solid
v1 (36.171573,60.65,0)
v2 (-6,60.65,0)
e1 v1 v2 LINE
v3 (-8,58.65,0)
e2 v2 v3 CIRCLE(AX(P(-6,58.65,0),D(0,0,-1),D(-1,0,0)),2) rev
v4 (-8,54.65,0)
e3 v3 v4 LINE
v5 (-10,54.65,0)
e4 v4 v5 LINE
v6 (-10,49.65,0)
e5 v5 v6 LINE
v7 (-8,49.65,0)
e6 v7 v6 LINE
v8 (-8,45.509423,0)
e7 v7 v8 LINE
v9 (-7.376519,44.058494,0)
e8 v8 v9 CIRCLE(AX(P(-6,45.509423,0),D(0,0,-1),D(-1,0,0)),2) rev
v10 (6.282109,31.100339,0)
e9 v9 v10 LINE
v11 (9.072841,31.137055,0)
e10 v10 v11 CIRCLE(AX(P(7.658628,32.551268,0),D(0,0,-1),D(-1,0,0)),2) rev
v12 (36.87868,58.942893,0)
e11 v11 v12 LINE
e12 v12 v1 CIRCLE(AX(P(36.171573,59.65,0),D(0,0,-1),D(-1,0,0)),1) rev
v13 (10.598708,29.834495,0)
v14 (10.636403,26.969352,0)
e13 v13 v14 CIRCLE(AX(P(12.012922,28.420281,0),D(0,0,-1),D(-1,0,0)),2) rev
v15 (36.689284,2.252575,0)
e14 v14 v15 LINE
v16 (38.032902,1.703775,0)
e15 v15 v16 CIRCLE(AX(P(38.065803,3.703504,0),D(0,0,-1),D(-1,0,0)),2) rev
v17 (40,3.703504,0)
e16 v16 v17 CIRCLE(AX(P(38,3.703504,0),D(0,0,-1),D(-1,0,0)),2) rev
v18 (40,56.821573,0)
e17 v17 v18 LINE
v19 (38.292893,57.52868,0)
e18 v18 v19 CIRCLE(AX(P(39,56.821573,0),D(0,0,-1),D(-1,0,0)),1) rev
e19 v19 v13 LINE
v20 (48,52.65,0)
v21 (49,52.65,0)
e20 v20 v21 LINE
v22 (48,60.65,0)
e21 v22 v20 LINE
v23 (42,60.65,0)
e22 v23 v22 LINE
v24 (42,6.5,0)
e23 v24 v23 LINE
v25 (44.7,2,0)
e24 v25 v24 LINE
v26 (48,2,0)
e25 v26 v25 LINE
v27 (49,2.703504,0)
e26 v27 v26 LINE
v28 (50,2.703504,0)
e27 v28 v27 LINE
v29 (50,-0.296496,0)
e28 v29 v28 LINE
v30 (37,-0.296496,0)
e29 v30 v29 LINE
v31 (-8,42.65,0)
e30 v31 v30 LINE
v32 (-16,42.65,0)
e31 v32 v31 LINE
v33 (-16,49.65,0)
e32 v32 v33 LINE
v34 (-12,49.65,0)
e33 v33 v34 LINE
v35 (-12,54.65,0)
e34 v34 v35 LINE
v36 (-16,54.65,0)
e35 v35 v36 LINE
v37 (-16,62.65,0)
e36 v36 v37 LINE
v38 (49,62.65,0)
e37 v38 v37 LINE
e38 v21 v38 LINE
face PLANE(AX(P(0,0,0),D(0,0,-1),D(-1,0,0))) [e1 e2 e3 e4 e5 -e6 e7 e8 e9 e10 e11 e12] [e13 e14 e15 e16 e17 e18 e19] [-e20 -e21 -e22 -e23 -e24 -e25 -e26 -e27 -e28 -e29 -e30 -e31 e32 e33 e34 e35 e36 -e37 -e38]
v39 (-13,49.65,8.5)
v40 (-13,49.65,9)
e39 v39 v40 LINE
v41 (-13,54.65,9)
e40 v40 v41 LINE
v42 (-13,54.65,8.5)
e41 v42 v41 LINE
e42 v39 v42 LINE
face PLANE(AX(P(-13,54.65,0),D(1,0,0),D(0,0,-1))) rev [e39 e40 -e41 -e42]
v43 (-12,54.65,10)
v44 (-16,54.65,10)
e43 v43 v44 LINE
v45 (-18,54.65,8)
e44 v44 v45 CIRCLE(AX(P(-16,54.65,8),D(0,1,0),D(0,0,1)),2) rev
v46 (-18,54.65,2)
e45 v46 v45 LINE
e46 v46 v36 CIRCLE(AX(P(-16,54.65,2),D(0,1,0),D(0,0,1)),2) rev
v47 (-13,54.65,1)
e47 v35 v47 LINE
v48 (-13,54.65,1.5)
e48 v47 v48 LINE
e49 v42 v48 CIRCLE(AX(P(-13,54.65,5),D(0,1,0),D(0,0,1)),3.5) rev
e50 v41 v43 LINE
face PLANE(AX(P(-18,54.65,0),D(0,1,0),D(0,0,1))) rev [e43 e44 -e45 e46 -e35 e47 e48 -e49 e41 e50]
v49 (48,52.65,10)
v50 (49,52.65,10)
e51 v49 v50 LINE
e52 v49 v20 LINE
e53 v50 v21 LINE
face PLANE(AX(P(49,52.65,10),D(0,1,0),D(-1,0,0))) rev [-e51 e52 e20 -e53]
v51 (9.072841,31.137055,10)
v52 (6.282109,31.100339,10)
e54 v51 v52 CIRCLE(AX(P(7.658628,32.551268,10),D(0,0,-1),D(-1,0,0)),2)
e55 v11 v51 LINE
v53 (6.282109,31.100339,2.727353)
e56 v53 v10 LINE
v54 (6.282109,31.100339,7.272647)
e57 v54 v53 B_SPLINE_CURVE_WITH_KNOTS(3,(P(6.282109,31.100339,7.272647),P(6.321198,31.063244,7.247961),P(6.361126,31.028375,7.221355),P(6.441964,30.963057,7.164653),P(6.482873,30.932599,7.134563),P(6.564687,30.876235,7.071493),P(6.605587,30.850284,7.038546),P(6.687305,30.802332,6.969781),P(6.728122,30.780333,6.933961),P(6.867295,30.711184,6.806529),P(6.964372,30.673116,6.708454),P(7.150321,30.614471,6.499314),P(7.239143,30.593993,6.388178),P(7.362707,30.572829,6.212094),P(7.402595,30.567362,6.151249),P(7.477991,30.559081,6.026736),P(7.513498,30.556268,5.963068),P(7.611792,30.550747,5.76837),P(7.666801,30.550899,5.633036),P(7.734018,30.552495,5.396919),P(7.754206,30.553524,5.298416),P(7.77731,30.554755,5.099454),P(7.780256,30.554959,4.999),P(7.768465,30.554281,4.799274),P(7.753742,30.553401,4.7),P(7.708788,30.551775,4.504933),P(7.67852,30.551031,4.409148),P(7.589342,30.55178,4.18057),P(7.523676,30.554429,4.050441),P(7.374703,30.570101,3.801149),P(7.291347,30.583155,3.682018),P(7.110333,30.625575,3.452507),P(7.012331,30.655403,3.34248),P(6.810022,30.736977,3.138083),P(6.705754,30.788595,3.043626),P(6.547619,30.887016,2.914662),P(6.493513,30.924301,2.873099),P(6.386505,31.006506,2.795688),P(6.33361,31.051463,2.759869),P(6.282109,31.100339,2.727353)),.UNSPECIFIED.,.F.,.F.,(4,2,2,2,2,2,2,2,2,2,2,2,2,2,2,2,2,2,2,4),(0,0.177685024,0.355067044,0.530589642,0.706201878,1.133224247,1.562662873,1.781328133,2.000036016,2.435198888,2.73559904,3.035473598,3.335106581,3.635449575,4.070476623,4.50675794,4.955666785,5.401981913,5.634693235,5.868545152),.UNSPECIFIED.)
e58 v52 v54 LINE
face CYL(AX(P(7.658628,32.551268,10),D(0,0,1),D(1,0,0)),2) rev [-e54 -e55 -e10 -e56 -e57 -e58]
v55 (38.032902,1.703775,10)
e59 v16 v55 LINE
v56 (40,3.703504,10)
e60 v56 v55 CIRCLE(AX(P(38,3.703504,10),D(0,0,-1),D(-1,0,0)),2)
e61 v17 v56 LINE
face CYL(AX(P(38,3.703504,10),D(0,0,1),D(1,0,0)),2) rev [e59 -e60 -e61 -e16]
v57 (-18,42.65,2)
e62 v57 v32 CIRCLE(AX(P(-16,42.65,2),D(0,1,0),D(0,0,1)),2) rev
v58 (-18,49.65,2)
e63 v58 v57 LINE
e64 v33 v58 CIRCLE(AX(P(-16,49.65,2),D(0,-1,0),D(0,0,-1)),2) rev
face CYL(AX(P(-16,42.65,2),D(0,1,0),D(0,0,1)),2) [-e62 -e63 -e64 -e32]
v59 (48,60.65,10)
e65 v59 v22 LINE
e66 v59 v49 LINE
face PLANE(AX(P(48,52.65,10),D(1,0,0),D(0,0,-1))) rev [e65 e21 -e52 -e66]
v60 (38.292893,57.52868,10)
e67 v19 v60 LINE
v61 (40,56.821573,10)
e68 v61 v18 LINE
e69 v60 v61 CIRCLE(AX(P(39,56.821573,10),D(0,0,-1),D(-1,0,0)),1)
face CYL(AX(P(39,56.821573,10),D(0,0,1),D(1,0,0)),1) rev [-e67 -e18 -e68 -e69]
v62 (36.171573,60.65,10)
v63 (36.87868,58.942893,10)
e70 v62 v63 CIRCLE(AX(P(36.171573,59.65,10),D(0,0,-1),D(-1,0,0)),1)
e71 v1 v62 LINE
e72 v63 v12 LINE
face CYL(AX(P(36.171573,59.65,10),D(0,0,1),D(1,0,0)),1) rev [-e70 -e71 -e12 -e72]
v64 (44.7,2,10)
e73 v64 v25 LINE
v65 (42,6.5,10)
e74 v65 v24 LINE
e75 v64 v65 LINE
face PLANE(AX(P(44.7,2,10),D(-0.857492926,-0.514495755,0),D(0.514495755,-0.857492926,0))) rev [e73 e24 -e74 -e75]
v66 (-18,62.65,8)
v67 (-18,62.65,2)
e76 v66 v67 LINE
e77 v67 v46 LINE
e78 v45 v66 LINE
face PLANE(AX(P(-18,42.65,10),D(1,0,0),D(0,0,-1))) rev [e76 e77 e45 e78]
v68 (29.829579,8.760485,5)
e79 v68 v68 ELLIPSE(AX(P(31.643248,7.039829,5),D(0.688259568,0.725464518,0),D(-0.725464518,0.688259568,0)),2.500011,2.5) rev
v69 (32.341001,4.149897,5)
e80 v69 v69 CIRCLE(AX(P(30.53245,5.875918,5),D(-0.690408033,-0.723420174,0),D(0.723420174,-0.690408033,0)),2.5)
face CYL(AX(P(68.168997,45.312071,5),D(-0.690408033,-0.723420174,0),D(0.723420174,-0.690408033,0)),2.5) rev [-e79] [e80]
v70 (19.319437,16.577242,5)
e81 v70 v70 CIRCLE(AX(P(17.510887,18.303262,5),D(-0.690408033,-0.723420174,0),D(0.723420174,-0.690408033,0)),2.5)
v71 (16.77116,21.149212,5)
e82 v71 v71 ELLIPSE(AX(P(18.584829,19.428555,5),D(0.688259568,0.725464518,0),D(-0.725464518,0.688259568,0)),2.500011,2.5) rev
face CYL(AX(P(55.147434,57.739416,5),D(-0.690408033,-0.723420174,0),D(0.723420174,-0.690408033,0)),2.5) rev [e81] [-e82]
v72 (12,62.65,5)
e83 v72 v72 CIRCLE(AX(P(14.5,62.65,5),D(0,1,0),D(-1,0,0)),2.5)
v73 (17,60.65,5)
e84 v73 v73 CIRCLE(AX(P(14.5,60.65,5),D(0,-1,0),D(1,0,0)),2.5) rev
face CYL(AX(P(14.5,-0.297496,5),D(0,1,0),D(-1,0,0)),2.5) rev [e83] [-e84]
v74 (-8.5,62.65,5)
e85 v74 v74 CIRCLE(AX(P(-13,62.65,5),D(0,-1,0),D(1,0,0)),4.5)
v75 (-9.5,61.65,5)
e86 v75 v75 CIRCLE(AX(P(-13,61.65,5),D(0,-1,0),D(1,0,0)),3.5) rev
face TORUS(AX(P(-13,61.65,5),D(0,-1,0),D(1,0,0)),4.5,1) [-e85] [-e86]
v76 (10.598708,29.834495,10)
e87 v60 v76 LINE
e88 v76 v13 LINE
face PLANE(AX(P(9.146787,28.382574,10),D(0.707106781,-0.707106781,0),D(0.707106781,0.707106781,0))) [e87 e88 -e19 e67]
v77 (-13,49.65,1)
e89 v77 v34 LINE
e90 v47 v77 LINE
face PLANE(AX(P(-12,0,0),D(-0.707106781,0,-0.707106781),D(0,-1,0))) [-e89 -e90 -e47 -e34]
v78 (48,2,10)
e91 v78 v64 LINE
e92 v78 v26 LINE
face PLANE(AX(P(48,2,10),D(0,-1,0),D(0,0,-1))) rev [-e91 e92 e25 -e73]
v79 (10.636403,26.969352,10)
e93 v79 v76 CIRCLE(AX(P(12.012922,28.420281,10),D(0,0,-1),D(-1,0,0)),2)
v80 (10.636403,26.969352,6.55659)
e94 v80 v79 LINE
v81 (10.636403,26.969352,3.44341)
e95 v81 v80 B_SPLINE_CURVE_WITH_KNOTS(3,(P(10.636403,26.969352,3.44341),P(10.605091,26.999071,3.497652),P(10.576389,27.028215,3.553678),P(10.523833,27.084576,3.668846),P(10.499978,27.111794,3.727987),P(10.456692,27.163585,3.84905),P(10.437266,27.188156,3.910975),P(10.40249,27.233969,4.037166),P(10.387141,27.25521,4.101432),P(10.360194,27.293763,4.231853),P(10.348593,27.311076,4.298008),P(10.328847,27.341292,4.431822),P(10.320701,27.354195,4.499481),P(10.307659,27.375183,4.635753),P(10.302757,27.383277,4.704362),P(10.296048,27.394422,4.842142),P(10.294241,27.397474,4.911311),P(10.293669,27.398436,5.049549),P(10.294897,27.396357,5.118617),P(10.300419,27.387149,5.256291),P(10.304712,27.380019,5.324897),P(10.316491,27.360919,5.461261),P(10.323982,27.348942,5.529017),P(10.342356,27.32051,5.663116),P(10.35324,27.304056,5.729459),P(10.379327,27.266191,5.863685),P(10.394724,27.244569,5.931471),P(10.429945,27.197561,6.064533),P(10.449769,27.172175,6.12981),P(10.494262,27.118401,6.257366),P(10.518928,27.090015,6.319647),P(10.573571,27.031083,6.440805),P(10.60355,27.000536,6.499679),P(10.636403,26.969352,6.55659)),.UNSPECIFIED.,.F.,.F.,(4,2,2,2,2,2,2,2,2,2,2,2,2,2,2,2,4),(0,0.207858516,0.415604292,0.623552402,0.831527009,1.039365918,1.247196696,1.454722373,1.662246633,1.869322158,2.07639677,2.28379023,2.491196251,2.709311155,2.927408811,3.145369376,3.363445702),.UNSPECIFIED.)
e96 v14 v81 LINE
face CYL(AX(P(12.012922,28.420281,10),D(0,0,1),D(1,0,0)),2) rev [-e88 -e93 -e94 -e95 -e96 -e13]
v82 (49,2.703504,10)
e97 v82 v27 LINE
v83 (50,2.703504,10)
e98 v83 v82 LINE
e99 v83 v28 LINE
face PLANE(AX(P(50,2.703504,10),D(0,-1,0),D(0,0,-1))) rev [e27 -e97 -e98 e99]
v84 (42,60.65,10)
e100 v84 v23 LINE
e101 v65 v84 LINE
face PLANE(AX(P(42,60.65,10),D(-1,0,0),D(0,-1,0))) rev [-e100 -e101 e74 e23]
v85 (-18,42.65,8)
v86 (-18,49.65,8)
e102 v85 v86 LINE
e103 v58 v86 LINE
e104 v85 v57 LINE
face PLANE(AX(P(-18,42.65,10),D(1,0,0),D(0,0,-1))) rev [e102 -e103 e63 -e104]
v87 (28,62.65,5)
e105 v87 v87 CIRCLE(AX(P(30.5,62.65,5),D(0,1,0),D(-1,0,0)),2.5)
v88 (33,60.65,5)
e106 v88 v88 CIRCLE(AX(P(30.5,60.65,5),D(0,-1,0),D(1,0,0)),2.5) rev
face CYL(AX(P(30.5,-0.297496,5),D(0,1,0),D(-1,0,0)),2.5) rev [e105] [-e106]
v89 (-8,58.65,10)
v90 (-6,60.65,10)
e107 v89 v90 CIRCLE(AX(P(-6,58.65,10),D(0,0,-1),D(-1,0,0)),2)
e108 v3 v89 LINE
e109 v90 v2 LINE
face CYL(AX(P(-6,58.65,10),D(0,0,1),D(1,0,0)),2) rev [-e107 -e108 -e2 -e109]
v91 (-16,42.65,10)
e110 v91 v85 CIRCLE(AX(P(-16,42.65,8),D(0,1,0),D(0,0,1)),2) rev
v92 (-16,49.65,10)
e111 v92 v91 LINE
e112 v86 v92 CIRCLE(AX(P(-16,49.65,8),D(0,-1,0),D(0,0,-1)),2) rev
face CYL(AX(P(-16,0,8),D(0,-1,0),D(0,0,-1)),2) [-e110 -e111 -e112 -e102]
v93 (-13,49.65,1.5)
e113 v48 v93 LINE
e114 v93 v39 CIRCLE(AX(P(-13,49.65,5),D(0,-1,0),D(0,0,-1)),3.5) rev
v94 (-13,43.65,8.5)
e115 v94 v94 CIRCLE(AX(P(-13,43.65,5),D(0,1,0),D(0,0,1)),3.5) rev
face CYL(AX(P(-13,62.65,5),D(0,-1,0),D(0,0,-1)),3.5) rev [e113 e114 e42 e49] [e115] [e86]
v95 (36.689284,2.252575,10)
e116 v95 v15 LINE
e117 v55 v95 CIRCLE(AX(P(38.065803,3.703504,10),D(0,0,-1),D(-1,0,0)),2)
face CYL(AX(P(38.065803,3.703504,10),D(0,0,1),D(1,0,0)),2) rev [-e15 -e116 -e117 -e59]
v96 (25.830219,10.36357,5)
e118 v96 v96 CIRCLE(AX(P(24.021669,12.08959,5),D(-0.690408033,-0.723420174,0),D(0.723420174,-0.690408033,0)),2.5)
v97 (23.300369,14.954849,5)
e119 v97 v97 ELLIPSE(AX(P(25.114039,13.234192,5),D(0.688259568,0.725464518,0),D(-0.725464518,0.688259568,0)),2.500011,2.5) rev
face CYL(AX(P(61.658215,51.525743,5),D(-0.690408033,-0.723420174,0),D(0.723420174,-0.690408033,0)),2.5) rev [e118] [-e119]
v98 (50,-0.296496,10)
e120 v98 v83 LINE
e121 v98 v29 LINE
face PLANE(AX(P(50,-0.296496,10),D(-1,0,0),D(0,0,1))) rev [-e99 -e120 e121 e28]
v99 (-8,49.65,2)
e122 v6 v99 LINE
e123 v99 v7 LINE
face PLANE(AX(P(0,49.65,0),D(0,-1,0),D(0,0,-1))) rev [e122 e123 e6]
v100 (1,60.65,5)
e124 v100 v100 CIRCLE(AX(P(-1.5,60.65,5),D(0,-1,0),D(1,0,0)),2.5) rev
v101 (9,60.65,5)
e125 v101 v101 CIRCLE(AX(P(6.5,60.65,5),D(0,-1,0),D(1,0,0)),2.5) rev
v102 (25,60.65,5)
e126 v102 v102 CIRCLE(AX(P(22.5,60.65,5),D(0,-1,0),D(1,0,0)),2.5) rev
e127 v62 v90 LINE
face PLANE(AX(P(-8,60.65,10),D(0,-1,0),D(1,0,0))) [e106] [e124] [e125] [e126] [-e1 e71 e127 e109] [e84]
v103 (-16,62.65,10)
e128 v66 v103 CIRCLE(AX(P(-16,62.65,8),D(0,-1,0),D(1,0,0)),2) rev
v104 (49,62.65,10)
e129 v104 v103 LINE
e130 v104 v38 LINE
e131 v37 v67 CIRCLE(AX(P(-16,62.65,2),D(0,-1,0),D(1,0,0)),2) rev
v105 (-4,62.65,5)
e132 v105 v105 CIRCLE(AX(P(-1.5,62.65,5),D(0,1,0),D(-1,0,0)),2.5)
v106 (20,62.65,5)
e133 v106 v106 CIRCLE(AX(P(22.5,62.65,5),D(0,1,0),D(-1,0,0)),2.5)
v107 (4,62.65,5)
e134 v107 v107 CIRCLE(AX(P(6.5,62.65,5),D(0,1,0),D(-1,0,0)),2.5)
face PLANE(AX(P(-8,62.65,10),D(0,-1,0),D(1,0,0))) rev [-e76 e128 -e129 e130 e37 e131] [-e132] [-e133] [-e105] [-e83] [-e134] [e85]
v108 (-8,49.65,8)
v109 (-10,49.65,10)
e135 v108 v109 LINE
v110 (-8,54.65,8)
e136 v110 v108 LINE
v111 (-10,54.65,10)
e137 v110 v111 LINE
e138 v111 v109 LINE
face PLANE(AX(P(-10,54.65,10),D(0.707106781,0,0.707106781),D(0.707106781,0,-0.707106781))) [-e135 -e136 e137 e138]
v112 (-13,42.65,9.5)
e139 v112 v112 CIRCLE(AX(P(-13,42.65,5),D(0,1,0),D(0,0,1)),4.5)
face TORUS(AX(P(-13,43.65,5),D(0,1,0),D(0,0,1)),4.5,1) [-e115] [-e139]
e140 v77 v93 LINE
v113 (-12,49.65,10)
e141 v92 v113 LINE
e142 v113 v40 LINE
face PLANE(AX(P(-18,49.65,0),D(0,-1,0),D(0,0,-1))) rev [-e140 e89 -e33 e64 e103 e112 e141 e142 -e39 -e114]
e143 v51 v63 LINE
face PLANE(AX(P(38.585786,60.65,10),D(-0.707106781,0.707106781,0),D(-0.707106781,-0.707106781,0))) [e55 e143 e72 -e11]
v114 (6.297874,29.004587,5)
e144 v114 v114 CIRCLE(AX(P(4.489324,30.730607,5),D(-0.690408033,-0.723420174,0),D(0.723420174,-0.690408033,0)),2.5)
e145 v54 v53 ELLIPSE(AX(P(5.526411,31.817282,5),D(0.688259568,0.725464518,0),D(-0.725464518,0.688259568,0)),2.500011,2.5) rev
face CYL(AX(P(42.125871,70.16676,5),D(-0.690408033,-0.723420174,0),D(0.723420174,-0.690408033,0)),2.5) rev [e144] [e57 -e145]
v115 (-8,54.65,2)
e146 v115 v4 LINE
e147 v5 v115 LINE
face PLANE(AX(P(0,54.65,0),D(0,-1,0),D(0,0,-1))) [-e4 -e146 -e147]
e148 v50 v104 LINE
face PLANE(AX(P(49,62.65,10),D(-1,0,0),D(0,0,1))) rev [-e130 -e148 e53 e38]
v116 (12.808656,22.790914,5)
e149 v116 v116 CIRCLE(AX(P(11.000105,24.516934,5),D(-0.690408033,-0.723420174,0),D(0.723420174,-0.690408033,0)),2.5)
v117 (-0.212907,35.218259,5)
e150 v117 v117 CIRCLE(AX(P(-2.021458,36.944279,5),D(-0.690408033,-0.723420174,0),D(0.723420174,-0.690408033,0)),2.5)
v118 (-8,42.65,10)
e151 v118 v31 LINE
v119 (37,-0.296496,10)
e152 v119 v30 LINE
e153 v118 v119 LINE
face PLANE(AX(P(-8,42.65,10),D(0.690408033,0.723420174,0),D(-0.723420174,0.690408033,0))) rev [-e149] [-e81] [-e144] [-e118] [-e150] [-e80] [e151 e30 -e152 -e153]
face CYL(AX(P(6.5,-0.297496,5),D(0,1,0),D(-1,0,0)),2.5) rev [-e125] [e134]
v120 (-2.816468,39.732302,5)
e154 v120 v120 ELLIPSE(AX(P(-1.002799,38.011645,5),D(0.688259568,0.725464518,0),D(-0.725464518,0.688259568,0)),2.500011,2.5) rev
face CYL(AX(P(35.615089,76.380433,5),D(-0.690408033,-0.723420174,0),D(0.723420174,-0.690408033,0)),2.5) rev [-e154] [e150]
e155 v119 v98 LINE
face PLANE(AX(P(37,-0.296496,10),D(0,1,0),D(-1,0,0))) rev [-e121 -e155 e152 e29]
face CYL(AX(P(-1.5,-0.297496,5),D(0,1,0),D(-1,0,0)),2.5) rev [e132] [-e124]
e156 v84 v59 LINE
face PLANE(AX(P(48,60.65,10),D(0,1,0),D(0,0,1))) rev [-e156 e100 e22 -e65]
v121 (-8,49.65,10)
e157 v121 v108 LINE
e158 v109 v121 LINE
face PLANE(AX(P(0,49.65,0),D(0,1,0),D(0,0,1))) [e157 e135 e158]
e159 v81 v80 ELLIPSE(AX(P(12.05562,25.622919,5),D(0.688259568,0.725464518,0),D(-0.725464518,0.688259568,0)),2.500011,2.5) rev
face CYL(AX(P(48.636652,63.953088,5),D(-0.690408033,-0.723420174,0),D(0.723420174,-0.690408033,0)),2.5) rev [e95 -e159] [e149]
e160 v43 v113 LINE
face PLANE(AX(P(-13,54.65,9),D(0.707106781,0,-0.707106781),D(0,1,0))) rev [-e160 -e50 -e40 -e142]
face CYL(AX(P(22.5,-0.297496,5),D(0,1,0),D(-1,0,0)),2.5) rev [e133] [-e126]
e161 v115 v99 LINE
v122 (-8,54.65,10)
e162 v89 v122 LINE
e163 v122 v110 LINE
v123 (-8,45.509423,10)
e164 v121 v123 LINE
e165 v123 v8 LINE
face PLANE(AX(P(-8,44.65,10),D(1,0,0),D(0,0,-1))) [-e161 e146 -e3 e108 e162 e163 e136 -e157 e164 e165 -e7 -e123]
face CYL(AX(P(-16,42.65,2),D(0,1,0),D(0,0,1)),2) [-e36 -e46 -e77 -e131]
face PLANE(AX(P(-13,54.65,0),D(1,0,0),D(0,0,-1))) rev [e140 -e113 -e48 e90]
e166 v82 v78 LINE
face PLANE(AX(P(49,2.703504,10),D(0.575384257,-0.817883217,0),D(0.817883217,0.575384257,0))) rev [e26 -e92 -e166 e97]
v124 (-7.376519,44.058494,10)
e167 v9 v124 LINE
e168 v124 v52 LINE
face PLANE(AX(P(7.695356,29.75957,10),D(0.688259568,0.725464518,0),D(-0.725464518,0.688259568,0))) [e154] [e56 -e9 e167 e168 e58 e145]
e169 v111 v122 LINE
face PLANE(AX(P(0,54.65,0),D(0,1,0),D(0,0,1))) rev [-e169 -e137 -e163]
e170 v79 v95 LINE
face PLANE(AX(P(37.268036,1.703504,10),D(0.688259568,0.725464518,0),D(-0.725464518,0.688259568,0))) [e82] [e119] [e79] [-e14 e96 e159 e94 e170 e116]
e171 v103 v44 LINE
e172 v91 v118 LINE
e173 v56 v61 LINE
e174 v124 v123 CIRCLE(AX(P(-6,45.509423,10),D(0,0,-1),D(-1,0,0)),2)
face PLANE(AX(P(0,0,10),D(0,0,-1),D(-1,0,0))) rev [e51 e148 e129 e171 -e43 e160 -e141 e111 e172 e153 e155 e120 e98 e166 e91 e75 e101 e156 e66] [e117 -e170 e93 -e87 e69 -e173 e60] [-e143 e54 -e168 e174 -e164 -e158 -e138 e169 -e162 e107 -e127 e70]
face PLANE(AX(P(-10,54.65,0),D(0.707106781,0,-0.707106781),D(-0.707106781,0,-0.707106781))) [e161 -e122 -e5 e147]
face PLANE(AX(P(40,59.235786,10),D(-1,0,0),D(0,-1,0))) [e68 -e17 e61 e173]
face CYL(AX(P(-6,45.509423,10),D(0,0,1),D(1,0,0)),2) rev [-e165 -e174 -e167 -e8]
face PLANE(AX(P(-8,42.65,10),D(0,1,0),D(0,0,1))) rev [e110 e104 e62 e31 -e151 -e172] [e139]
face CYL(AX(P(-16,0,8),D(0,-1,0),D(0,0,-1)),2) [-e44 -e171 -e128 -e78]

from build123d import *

# Parameters (mm, degrees)
FRAME_DEPTH         = 10
SKETCH13_R          = 3.5
CUT_EXTRUDE7_DEPTH  = 67.66634461
FILLET4_R           = 1
SKETCH14_W          = 5
SKETCH14_H          = 5
CUT_EXTRUDE8_DEPTH  = 81.777611378
FILLET5_R           = 2
CUT_EXTRUDE9_DEPTH  = 5
CHAMFER1_SIZE       = 1
FILLET6_R           = 2
FILLET7_R           = 1
CUT_EXTRUDE11_REACH = 59.656
SKETCH18_R          = 2.5
CUT_EXTRUDE12_REACH = 83.008
SKETCH19_R          = 2.5


with BuildPart() as part:
    # Sketch1 → Frame (new body)
    with BuildSketch(Plane.XY):
        Polygon((-8, 62.65), (49, 62.65), (49, 52.65), (48, 52.65), (48, 60.65), (42, 60.65), (42, 6.5), (44.7, 2), (48, 2), (49, 2.703504174), (50, 2.703504174), (50, -0.296495826), (37, -0.296495826), (-8, 42.65), (-18, 42.65), (-18, 62.65), align=None)
        Polygon((-8, 44.65), (-8, 60.65), (38.585786438, 60.65), (7.695355997, 29.759569559), align=None, mode=Mode.SUBTRACT)
        Polygon((40, 59.235786438), (40, 1.703504174), (37.268035971, 1.703504174), (9.146787391, 28.382573828), align=None, mode=Mode.SUBTRACT)
    extrude(amount=FRAME_DEPTH)

    # Sketch13 → Cut-Extrude7 (cut, through all)
    with BuildSketch(Plane.XZ.offset(-42.65)):
        with Locations(Location((-13, 5, 0), (0, 0, 270))):
            Circle(SKETCH13_R)
    extrude(amount=-CUT_EXTRUDE7_DEPTH, mode=Mode.SUBTRACT)

    # Fillet4
    fillet4_edges = [part.edges().sort_by_distance(p)[0] for p in [
        (-13, 62.65, 8.5),
        (-13, 42.65, 8.5),
    ]]
    fillet(fillet4_edges, radius=FILLET4_R)

    # Sketch14 → Cut-Extrude8 (cut, through all)
    with BuildSketch(Plane.XY.offset(10)):
        with Locations((-15.5, 52.15)):
            Rectangle(SKETCH14_W, SKETCH14_H)
    extrude(amount=-CUT_EXTRUDE8_DEPTH, mode=Mode.SUBTRACT)

    # Fillet5
    fillet5_edges = [part.edges().sort_by_distance(p)[0] for p in [
        (-18, 58.65, 0),
        (-18, 58.65, 10),
        (-18, 46.15, 0),
        (-18, 46.15, 10),
    ]]
    fillet(fillet5_edges, radius=FILLET5_R)

    # Sketch15 → Cut-Extrude9 (cut)
    with BuildSketch(Plane(origin=(0, 49.65, 0), x_dir=(1, 0, 0), z_dir=(0, 1, 0))):
        Polygon((-10, 0), (-8, -2), (-8, 0), align=None)
        Polygon((-10, -10), (-8, -8), (-8, -10), align=None)
    extrude(amount=CUT_EXTRUDE9_DEPTH, mode=Mode.SUBTRACT)

    # Chamfer1
    chamfer1_edges = [part.edges().sort_by_distance(p)[0] for p in [
        (-13, 52.15, 0),
        (-13, 52.15, 10),
    ]]
    chamfer(chamfer1_edges, length=CHAMFER1_SIZE)

    # Fillet6
    # the kernel refuses this fillet: 2 mm, written as the material it adds along each edge
    with BuildSketch(Plane(origin=(-8, 60.65, 0), x_dir=(0, -1, 0), z_dir=(0, 0, 1)), Plane(origin=(40, 1.703504174, 0), x_dir=(0, 1, 0), z_dir=(0, 0, 1))) as fillet6_piece_1:
        with BuildLine():
            CenterArc((FILLET6_R, FILLET6_R), FILLET6_R, 180, 90)
            Line((0, FILLET6_R), (0, 0))
            Line((0, 0), (FILLET6_R, 0))
        make_face()
    extrude(amount=10)
    with BuildSketch(Plane(origin=(37.268035971, 1.703504174, 0), x_dir=(1, 0, 0), z_dir=(0, 0, 1))) as fillet6_piece_2:
        with BuildLine():
            CenterArc((FILLET6_R * 0.398883640348, FILLET6_R), FILLET6_R, 226.507503973, 43.492496027)
            Line((-FILLET6_R * 0.289375927855, FILLET6_R * 0.274535482069), (0, 0))
            Line((0, 0), (FILLET6_R * 0.398883640348, 0))
        make_face()
    extrude(amount=10)
    with BuildSketch(Plane(origin=(-8, 44.65, 0), x_dir=(0, 1, 0), z_dir=(0, 0, 1))) as fillet6_piece_3:
        with BuildLine():
            CenterArc((FILLET6_R * 0.429711480151, -FILLET6_R), FILLET6_R, 90, 46.507503973)
            Line((-FILLET6_R * 0.29575303778, -FILLET6_R * 0.311740431797), (0, 0))
            Line((0, 0), (FILLET6_R * 0.429711480151, 0))
        make_face()
    extrude(amount=10)
    with BuildSketch(Plane(origin=(9.146787391, 28.382573828, 0), x_dir=(0.7254645179309741, -0.6882595682031448, 0), z_dir=(0, 0, 1))) as fillet6_piece_4:
        with BuildLine():
            CenterArc((FILLET6_R * 1.02666321267, FILLET6_R), FILLET6_R, 178.492496027, 91.507503973)
            Line((FILLET6_R * 0.0270093246389, FILLET6_R * 1.02630787225), (0, 0))
            Line((0, 0), (FILLET6_R * 1.02666321267, 0))
        make_face()
    extrude(amount=10)
    with BuildSketch(Plane(origin=(7.695355997, 29.759569559, 0), x_dir=(0.7071067811865478, 0.7071067811865474, 0), z_dir=(0, 0, 1))) as fillet6_piece_5:
        with BuildLine():
            CenterArc((FILLET6_R * 0.974029250934, FILLET6_R), FILLET6_R, 181.507503973, 88.492496027)
            Line((-FILLET6_R * 0.0256246370977, FILLET6_R * 0.973692127754), (0, 0))
            Line((0, 0), (FILLET6_R * 0.974029250934, 0))
        make_face()
    extrude(amount=10)

    # Fillet7
    fillet7_edges = [part.edges().sort_by_distance(p)[0] for p in [
        (38.585786438, 60.65, 5),
        (40, 59.235786438, 5),
    ]]
    fillet(fillet7_edges, radius=FILLET7_R)

    # Sketch18 → Cut-Extrude11 (cut, up to next)
    with BuildSketch(Plane(origin=(17.488453969, 18.324671512, 0), x_dir=(0.7234201739583832, -0.6904080329124386, 0), z_dir=(-0.6904080329124386, -0.7234201739583832, 0)), mode=Mode.PRIVATE) as cut_extrude11_sk1:
        with Locations((-26.968990252, 5)):
            Circle(SKETCH18_R)
    cut_extrude11_tool1 = extrude(cut_extrude11_sk1.sketch, amount=-CUT_EXTRUDE11_REACH, mode=Mode.PRIVATE) & part.part
    # Sketch18 → Cut-Extrude11 (cut, up to next)
    with BuildSketch(Plane(origin=(17.488453969, 18.324671512, 0), x_dir=(0.7234201739583832, -0.6904080329124386, 0), z_dir=(-0.6904080329124386, -0.7234201739583832, 0)), mode=Mode.PRIVATE) as cut_extrude11_sk2:
        with Locations((-17.968990252, 5)):
            Circle(SKETCH18_R)
    cut_extrude11_tool2 = extrude(cut_extrude11_sk2.sketch, amount=-CUT_EXTRUDE11_REACH, mode=Mode.PRIVATE) & part.part
    # Sketch18 → Cut-Extrude11 (cut, up to next)
    with BuildSketch(Plane(origin=(17.488453969, 18.324671512, 0), x_dir=(0.7234201739583832, -0.6904080329124386, 0), z_dir=(-0.6904080329124386, -0.7234201739583832, 0)), mode=Mode.PRIVATE) as cut_extrude11_sk3:
        with Locations((-8.968990252, 5)):
            Circle(SKETCH18_R)
    cut_extrude11_tool3 = extrude(cut_extrude11_sk3.sketch, amount=-CUT_EXTRUDE11_REACH, mode=Mode.PRIVATE) & part.part
    # Sketch18 → Cut-Extrude11 (cut, up to next)
    with BuildSketch(Plane(origin=(17.488453969, 18.324671512, 0), x_dir=(0.7234201739583832, -0.6904080329124386, 0), z_dir=(-0.6904080329124386, -0.7234201739583832, 0)), mode=Mode.PRIVATE) as cut_extrude11_sk4:
        with Locations((0.031009748, 5)):
            Circle(SKETCH18_R)
    cut_extrude11_tool4 = extrude(cut_extrude11_sk4.sketch, amount=-CUT_EXTRUDE11_REACH, mode=Mode.PRIVATE) & part.part
    # Sketch18 → Cut-Extrude11 (cut, up to next)
    with BuildSketch(Plane(origin=(17.488453969, 18.324671512, 0), x_dir=(0.7234201739583832, -0.6904080329124386, 0), z_dir=(-0.6904080329124386, -0.7234201739583832, 0)), mode=Mode.PRIVATE) as cut_extrude11_sk5:
        with Locations((9.031009748, 5)):
            Circle(SKETCH18_R)
    cut_extrude11_tool5 = extrude(cut_extrude11_sk5.sketch, amount=-CUT_EXTRUDE11_REACH, mode=Mode.PRIVATE) & part.part
    # Sketch18 → Cut-Extrude11 (cut, up to next)
    with BuildSketch(Plane(origin=(17.488453969, 18.324671512, 0), x_dir=(0.7234201739583832, -0.6904080329124386, 0), z_dir=(-0.6904080329124386, -0.7234201739583832, 0)), mode=Mode.PRIVATE) as cut_extrude11_sk6:
        with Locations((18.031009748, 5)):
            Circle(SKETCH18_R)
    cut_extrude11_tool6 = extrude(cut_extrude11_sk6.sketch, amount=-CUT_EXTRUDE11_REACH, mode=Mode.PRIVATE) & part.part
    add(cut_extrude11_tool1.solids().sort_by_distance((-2.021458, 36.944279, 5))[0], mode=Mode.SUBTRACT)
    add(cut_extrude11_tool2.solids().sort_by_distance((4.489324, 30.730607, 5))[0], mode=Mode.SUBTRACT)
    add(cut_extrude11_tool3.solids().sort_by_distance((11.000105, 24.516934, 5))[0], mode=Mode.SUBTRACT)
    add(cut_extrude11_tool4.solids().sort_by_distance((17.510887, 18.303262, 5))[0], mode=Mode.SUBTRACT)
    add(cut_extrude11_tool5.solids().sort_by_distance((24.021669, 12.08959, 5))[0], mode=Mode.SUBTRACT)
    add(cut_extrude11_tool6.solids().sort_by_distance((30.53245, 5.875918, 5))[0], mode=Mode.SUBTRACT)

    # Sketch19 → Cut-Extrude12 (cut, up to next)
    with BuildSketch(Plane(origin=(0, 62.65, 0), x_dir=(1, 0, 0), z_dir=(0, 1, 0)), mode=Mode.PRIVATE) as cut_extrude12_sk1:
        with Locations(Location((-1.5, -5, 0), (0, 0, 180))):
            Circle(SKETCH19_R)
    cut_extrude12_tool1 = extrude(cut_extrude12_sk1.sketch, amount=-CUT_EXTRUDE12_REACH, mode=Mode.PRIVATE) & part.part
    # Sketch19 → Cut-Extrude12 (cut, up to next)
    with BuildSketch(Plane(origin=(0, 62.65, 0), x_dir=(1, 0, 0), z_dir=(0, 1, 0)), mode=Mode.PRIVATE) as cut_extrude12_sk2:
        with Locations(Location((6.5, -5, 0), (0, 0, 180))):
            Circle(SKETCH19_R)
    cut_extrude12_tool2 = extrude(cut_extrude12_sk2.sketch, amount=-CUT_EXTRUDE12_REACH, mode=Mode.PRIVATE) & part.part
    # Sketch19 → Cut-Extrude12 (cut, up to next)
    with BuildSketch(Plane(origin=(0, 62.65, 0), x_dir=(1, 0, 0), z_dir=(0, 1, 0)), mode=Mode.PRIVATE) as cut_extrude12_sk3:
        with Locations(Location((14.5, -5, 0), (0, 0, 180))):
            Circle(SKETCH19_R)
    cut_extrude12_tool3 = extrude(cut_extrude12_sk3.sketch, amount=-CUT_EXTRUDE12_REACH, mode=Mode.PRIVATE) & part.part
    # Sketch19 → Cut-Extrude12 (cut, up to next)
    with BuildSketch(Plane(origin=(0, 62.65, 0), x_dir=(1, 0, 0), z_dir=(0, 1, 0)), mode=Mode.PRIVATE) as cut_extrude12_sk4:
        with Locations(Location((22.5, -5, 0), (0, 0, 180))):
            Circle(SKETCH19_R)
    cut_extrude12_tool4 = extrude(cut_extrude12_sk4.sketch, amount=-CUT_EXTRUDE12_REACH, mode=Mode.PRIVATE) & part.part
    # Sketch19 → Cut-Extrude12 (cut, up to next)
    with BuildSketch(Plane(origin=(0, 62.65, 0), x_dir=(1, 0, 0), z_dir=(0, 1, 0)), mode=Mode.PRIVATE) as cut_extrude12_sk5:
        with Locations(Location((30.5, -5, 0), (0, 0, 180))):
            Circle(SKETCH19_R)
    cut_extrude12_tool5 = extrude(cut_extrude12_sk5.sketch, amount=-CUT_EXTRUDE12_REACH, mode=Mode.PRIVATE) & part.part
    add(cut_extrude12_tool1.solids().sort_by_distance((-1.5, 62.65, 5))[0], mode=Mode.SUBTRACT)
    add(cut_extrude12_tool2.solids().sort_by_distance((6.5, 62.65, 5))[0], mode=Mode.SUBTRACT)
    add(cut_extrude12_tool3.solids().sort_by_distance((14.5, 62.65, 5))[0], mode=Mode.SUBTRACT)
    add(cut_extrude12_tool4.solids().sort_by_distance((22.5, 62.65, 5))[0], mode=Mode.SUBTRACT)
    add(cut_extrude12_tool5.solids().sort_by_distance((30.5, 62.65, 5))[0], mode=Mode.SUBTRACT)


solid = part.part
